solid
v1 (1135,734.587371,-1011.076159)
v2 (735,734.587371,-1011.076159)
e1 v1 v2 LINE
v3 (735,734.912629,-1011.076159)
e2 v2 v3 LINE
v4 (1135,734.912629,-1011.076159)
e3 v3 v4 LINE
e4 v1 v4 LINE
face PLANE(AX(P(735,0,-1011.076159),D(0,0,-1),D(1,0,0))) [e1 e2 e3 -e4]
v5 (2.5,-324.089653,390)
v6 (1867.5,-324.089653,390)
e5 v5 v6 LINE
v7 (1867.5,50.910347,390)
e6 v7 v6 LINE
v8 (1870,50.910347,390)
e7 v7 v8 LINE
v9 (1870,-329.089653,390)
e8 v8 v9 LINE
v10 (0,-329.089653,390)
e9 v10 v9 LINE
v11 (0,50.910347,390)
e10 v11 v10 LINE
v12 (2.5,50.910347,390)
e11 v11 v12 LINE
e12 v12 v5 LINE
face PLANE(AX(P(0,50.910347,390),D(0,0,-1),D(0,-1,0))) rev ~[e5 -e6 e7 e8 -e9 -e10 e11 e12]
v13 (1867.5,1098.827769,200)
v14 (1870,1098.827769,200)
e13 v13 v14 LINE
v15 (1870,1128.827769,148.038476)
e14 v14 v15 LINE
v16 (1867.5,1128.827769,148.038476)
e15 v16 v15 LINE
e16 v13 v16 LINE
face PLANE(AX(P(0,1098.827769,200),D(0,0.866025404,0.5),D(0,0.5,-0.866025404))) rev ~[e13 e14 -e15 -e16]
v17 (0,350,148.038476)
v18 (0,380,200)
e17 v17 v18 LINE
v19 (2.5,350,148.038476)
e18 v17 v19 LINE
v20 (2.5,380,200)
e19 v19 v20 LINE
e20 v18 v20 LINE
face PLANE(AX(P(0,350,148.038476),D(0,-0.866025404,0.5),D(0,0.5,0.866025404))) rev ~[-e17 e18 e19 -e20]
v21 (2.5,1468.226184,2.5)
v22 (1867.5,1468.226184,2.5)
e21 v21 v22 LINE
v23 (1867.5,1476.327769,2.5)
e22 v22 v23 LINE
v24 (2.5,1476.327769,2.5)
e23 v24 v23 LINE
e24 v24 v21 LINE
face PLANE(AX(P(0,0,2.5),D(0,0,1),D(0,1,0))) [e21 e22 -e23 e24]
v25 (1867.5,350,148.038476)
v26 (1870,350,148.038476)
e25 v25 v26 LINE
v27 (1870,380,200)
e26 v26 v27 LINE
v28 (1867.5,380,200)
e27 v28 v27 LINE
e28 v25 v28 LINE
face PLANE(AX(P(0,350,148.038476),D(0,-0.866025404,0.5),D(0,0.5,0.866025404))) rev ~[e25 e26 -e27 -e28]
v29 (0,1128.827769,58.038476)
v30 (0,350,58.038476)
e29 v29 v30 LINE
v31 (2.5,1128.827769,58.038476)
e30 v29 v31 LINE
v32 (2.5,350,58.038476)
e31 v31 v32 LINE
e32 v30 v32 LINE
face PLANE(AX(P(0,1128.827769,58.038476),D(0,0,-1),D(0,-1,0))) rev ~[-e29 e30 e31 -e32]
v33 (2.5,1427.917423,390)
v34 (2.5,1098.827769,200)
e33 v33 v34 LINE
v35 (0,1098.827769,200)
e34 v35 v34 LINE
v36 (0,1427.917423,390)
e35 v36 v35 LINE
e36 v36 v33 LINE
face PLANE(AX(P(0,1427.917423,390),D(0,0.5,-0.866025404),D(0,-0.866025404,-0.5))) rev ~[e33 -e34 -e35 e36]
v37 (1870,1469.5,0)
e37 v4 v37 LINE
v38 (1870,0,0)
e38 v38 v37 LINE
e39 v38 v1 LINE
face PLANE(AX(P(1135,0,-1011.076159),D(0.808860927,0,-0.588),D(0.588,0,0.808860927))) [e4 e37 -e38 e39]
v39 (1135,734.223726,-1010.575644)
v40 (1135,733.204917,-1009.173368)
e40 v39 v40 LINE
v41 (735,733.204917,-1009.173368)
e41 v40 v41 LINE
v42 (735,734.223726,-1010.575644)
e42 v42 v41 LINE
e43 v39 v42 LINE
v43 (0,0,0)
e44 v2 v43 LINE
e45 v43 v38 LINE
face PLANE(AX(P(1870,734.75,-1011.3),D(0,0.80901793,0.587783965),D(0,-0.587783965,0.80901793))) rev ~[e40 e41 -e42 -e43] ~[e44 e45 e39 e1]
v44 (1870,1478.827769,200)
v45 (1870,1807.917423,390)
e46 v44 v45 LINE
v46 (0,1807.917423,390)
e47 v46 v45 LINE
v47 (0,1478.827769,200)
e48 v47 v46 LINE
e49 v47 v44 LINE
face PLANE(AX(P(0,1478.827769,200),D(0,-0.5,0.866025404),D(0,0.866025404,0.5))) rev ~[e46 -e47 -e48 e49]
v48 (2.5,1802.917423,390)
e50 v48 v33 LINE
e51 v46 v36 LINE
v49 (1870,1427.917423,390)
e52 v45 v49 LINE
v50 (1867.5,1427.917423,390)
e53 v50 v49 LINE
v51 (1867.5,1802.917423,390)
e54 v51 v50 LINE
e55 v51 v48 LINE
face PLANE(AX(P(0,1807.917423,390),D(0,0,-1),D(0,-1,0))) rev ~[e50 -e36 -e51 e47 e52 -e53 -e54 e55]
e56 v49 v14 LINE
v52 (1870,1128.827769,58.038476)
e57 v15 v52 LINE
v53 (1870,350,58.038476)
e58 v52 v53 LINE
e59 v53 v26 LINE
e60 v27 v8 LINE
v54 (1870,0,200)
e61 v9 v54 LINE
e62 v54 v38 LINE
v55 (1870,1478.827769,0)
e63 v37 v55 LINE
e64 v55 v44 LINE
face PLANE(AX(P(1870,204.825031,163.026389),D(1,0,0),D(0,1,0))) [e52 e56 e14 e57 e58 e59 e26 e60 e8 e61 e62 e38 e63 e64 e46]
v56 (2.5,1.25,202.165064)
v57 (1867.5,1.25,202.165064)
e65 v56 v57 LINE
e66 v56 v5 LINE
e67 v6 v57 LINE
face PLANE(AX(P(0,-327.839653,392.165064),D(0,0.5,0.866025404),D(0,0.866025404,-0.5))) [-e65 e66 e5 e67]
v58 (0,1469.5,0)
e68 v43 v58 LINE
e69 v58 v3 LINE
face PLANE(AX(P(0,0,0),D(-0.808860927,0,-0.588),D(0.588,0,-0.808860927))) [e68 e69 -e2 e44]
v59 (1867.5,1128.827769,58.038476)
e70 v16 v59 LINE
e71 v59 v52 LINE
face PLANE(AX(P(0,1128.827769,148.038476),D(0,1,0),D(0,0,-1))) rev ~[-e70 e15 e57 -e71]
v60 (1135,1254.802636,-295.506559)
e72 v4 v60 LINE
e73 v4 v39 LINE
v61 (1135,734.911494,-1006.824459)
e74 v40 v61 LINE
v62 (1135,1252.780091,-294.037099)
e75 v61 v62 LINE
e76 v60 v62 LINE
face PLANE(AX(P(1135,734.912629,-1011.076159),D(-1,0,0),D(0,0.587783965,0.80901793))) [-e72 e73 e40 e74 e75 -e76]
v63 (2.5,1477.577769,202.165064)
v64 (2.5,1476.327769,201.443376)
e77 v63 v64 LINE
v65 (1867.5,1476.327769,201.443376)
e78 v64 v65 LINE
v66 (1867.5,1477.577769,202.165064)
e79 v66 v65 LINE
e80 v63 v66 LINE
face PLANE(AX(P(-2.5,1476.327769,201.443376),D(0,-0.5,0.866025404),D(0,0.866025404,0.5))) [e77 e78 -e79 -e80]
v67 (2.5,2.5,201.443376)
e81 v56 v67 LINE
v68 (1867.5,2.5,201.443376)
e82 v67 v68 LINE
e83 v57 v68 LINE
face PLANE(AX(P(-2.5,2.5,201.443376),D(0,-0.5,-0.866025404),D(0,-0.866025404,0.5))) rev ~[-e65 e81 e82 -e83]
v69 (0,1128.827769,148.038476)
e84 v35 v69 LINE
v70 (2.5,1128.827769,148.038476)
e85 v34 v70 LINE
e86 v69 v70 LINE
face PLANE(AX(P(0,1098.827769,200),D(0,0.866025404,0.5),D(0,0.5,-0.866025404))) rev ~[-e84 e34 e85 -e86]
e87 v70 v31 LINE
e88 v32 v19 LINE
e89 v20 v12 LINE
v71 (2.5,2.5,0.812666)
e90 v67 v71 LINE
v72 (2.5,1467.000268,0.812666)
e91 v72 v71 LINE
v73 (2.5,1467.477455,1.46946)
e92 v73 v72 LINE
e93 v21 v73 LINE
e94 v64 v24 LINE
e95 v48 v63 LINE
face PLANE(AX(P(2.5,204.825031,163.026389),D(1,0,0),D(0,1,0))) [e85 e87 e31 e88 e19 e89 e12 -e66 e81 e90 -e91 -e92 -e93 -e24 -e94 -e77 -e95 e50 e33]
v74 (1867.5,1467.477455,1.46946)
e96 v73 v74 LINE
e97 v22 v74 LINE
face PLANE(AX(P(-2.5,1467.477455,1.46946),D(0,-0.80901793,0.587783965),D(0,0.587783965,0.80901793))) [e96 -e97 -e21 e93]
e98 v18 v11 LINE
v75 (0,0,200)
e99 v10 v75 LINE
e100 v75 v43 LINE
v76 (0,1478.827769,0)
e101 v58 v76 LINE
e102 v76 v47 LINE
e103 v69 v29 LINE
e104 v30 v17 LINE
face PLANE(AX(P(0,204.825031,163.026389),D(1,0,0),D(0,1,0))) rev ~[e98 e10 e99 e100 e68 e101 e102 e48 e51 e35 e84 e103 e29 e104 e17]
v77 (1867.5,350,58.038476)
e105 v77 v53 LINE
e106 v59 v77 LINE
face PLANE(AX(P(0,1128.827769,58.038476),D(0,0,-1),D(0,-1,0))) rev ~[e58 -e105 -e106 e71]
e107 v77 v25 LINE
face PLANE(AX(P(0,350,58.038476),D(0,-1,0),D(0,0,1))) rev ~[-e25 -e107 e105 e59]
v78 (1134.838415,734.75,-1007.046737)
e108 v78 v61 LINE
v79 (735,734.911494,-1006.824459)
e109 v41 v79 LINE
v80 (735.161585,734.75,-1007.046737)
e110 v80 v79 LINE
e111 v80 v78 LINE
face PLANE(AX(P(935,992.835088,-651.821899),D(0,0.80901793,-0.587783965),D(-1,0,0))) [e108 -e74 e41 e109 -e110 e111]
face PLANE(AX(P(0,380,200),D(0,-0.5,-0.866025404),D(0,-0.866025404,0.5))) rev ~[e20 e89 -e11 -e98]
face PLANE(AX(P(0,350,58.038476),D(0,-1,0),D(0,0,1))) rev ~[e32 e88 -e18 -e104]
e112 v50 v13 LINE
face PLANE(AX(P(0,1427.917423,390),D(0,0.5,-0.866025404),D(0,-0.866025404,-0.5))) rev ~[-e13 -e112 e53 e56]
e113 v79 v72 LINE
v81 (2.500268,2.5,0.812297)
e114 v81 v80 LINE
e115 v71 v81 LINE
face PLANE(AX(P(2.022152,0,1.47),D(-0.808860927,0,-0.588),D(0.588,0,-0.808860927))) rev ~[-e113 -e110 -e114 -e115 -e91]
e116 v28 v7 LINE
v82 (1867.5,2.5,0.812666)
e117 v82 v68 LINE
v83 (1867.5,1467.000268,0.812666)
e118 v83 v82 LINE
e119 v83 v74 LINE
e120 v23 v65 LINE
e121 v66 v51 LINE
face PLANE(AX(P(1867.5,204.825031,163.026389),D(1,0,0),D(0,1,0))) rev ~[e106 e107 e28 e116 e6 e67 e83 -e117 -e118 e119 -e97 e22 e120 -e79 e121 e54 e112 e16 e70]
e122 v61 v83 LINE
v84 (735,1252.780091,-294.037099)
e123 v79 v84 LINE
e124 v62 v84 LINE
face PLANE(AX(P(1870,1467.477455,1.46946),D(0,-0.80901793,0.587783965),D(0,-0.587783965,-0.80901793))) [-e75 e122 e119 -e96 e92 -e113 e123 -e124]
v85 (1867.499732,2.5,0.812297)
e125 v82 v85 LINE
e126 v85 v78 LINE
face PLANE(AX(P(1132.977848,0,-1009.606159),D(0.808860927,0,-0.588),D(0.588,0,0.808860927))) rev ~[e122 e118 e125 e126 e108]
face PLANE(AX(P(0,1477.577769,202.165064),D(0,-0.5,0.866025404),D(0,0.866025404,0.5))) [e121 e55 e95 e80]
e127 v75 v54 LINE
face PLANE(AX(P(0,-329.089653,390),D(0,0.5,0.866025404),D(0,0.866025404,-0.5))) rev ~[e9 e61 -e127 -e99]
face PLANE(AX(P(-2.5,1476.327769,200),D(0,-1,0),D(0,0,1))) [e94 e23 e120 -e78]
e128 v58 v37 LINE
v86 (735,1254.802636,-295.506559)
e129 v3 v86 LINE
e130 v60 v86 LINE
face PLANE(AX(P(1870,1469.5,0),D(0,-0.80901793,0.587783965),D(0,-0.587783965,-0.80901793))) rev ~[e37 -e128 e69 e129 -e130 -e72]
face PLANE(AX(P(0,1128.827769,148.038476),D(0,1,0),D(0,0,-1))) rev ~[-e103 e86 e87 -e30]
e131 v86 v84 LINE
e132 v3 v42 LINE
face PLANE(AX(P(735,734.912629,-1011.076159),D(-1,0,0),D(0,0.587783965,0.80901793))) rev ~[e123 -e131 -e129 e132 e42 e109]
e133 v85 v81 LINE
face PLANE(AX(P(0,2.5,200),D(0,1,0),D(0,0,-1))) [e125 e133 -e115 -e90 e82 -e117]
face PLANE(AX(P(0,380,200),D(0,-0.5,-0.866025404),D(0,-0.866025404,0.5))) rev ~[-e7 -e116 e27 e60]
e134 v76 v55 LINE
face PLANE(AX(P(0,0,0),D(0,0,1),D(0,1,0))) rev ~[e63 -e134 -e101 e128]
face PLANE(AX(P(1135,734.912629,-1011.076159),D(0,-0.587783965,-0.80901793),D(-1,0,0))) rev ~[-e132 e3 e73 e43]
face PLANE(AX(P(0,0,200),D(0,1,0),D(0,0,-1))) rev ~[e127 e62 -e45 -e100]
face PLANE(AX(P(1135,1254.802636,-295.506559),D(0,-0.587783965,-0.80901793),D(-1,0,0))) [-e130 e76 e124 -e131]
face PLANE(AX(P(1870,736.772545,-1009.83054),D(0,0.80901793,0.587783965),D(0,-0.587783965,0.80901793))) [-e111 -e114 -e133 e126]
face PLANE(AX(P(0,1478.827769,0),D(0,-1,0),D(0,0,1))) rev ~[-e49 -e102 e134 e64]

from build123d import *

# Parameters (mm, degrees)
F0_W        = 1870
F0_H        = 1469.5
F1_DEPTH    = 1011.3
F3_DEPTH    = 1870.001
F6_DEPTH    = 1469.501
F8_DEPTH    = 1870
F9_T        = 2.5
F9_T3_DEPTH = 1875
F10_W       = 400
F10_H       = 884.4916457885
F11_DEPTH   = 2.5


# Not quite as in the source:
# - a shell that OpenCascade refuses in one call is made with other operations: the cavity is built on its own and cut out


with BuildPart() as f1:
    # F0 (on Top) → F1 (new body)
    with BuildSketch(Plane.XY):
        with Locations((935, 734.75)):
            Rectangle(F0_W, F0_H)
    extrude(amount=-F1_DEPTH)

    # F2 (on face) → F3 (cut, through all)
    with BuildSketch(Plane.YZ.offset(1870)):
        Polygon((734.75, -1011.3), (0, 0), (0, -1011.3), align=None)
        Polygon((1469.5, 0), (734.75, -1011.3), (1469.5, -1011.3), align=None)
    extrude(amount=-F3_DEPTH, mode=Mode.SUBTRACT)

    # F5 (on face) → F6 (cut, through all)
    with BuildSketch(Plane(origin=(0, 0, 0), x_dir=(-1, 0, 0), z_dir=(0, 1, 0))):
        Polygon((0, -1011.0761593471), (0, 0), (-735, -1011.0761593471), (-1135, -1011.0761593471), (-1870, 0), (-1870, -1118.932723999), (0, -1118.932723999), align=None)
    extrude(amount=F6_DEPTH, mode=Mode.SUBTRACT)

    # F7 (on Right) → F8 (join)
    with BuildSketch(Plane.YZ):
        Polygon((0, 200), (0, 0), (739.4138846406, 0), (739.4138846406, 58.0384757729), (350, 58.0384757729), (350, 148.0384757729), (380, 200), (50.9103465619, 390), (-329.0896534381, 390), align=None)
        Polygon((739.4138846406, 58.0384757729), (739.4138846406, 0), (1478.8277692812, 0), (1478.8277692812, 200), (1807.9174227193, 390), (1427.9174227193, 390), (1098.8277692812, 200), (1128.8277692812, 148.0384757729), (1128.8277692812, 58.0384757729), align=None)
    extrude(amount=F8_DEPTH)

    # F9: shell of thickness 2.5, made by hand


with BuildPart() as f9_core1:
    # F9_t2: copy of F1
    add(f1.part)

    # the walls: a layer under each face that stays
    f9_faces = [f9_core1.faces().sort_by_distance(p)[0] for p in [
        (367.5, 734.75, -505.5380796735),
        (0, 27.0781925881, 65),
        (935, 367.2936853952, -505.5380796735),
        (935, 734.75, -1011.0761593471),
        (935, 1102.2063146048, -505.5380796735),
        (935, 0, 100),
        (935, 1474.1638846406, 0),
        (935, 1478.8277692812, 100),
        (935, 1643.3725960003, 295),
        (935, -164.544826719, 295),
        (1502.5, 734.75, -505.5380796735),
        (1870, 27.0781925881, 65),
    ]]
    thicken(f9_faces, amount=-F9_T, mode=Mode.SUBTRACT)

    # F9_s4 → F9_t3 (cut)
    with BuildSketch(Plane.YZ.offset(-2.5)):
        Polygon((1469.5202254482, -0.0396945991), (1467.4774551759, 1.4694599125), (1468.2261838709, 2.5), (1469.5, 2.5), align=None)
        Polygon((-0.0375, 199.9783493649), (2.5, 200), (2.5, 201.443375673), (1.25, 202.1650635095), align=None)
        Polygon((1478.8652692812, 199.9783493649), (1476.3277692812, 200), (1476.3277692812, 201.443375673), (1477.5777692812, 202.1650635095), align=None)
    extrude(amount=F9_T3_DEPTH, mode=Mode.SUBTRACT)


with BuildPart() as f1_1:
    add(f1.part)

    # what is left inside the walls is the cavity
    f9_cavity = [f9_core1.part.solids().sort_by_distance(p)[0] for p in [
        (1245.833333, 739.413885, 58.013476),
    ]]
    add(f9_cavity, mode=Mode.SUBTRACT)

    # F10 (on face) → F11 (cut)
    with BuildSketch(Plane(origin=(0, 961.8024604101, -698.7880527898), x_dir=(-1, 0, 0), z_dir=(0, 0.8090179296, -0.587783965))):
        with Locations((-935, 56.236940873)):
            Rectangle(F10_W, F10_H)
    extrude(amount=-F11_DEPTH, mode=Mode.SUBTRACT)


solid = f1_1.part
